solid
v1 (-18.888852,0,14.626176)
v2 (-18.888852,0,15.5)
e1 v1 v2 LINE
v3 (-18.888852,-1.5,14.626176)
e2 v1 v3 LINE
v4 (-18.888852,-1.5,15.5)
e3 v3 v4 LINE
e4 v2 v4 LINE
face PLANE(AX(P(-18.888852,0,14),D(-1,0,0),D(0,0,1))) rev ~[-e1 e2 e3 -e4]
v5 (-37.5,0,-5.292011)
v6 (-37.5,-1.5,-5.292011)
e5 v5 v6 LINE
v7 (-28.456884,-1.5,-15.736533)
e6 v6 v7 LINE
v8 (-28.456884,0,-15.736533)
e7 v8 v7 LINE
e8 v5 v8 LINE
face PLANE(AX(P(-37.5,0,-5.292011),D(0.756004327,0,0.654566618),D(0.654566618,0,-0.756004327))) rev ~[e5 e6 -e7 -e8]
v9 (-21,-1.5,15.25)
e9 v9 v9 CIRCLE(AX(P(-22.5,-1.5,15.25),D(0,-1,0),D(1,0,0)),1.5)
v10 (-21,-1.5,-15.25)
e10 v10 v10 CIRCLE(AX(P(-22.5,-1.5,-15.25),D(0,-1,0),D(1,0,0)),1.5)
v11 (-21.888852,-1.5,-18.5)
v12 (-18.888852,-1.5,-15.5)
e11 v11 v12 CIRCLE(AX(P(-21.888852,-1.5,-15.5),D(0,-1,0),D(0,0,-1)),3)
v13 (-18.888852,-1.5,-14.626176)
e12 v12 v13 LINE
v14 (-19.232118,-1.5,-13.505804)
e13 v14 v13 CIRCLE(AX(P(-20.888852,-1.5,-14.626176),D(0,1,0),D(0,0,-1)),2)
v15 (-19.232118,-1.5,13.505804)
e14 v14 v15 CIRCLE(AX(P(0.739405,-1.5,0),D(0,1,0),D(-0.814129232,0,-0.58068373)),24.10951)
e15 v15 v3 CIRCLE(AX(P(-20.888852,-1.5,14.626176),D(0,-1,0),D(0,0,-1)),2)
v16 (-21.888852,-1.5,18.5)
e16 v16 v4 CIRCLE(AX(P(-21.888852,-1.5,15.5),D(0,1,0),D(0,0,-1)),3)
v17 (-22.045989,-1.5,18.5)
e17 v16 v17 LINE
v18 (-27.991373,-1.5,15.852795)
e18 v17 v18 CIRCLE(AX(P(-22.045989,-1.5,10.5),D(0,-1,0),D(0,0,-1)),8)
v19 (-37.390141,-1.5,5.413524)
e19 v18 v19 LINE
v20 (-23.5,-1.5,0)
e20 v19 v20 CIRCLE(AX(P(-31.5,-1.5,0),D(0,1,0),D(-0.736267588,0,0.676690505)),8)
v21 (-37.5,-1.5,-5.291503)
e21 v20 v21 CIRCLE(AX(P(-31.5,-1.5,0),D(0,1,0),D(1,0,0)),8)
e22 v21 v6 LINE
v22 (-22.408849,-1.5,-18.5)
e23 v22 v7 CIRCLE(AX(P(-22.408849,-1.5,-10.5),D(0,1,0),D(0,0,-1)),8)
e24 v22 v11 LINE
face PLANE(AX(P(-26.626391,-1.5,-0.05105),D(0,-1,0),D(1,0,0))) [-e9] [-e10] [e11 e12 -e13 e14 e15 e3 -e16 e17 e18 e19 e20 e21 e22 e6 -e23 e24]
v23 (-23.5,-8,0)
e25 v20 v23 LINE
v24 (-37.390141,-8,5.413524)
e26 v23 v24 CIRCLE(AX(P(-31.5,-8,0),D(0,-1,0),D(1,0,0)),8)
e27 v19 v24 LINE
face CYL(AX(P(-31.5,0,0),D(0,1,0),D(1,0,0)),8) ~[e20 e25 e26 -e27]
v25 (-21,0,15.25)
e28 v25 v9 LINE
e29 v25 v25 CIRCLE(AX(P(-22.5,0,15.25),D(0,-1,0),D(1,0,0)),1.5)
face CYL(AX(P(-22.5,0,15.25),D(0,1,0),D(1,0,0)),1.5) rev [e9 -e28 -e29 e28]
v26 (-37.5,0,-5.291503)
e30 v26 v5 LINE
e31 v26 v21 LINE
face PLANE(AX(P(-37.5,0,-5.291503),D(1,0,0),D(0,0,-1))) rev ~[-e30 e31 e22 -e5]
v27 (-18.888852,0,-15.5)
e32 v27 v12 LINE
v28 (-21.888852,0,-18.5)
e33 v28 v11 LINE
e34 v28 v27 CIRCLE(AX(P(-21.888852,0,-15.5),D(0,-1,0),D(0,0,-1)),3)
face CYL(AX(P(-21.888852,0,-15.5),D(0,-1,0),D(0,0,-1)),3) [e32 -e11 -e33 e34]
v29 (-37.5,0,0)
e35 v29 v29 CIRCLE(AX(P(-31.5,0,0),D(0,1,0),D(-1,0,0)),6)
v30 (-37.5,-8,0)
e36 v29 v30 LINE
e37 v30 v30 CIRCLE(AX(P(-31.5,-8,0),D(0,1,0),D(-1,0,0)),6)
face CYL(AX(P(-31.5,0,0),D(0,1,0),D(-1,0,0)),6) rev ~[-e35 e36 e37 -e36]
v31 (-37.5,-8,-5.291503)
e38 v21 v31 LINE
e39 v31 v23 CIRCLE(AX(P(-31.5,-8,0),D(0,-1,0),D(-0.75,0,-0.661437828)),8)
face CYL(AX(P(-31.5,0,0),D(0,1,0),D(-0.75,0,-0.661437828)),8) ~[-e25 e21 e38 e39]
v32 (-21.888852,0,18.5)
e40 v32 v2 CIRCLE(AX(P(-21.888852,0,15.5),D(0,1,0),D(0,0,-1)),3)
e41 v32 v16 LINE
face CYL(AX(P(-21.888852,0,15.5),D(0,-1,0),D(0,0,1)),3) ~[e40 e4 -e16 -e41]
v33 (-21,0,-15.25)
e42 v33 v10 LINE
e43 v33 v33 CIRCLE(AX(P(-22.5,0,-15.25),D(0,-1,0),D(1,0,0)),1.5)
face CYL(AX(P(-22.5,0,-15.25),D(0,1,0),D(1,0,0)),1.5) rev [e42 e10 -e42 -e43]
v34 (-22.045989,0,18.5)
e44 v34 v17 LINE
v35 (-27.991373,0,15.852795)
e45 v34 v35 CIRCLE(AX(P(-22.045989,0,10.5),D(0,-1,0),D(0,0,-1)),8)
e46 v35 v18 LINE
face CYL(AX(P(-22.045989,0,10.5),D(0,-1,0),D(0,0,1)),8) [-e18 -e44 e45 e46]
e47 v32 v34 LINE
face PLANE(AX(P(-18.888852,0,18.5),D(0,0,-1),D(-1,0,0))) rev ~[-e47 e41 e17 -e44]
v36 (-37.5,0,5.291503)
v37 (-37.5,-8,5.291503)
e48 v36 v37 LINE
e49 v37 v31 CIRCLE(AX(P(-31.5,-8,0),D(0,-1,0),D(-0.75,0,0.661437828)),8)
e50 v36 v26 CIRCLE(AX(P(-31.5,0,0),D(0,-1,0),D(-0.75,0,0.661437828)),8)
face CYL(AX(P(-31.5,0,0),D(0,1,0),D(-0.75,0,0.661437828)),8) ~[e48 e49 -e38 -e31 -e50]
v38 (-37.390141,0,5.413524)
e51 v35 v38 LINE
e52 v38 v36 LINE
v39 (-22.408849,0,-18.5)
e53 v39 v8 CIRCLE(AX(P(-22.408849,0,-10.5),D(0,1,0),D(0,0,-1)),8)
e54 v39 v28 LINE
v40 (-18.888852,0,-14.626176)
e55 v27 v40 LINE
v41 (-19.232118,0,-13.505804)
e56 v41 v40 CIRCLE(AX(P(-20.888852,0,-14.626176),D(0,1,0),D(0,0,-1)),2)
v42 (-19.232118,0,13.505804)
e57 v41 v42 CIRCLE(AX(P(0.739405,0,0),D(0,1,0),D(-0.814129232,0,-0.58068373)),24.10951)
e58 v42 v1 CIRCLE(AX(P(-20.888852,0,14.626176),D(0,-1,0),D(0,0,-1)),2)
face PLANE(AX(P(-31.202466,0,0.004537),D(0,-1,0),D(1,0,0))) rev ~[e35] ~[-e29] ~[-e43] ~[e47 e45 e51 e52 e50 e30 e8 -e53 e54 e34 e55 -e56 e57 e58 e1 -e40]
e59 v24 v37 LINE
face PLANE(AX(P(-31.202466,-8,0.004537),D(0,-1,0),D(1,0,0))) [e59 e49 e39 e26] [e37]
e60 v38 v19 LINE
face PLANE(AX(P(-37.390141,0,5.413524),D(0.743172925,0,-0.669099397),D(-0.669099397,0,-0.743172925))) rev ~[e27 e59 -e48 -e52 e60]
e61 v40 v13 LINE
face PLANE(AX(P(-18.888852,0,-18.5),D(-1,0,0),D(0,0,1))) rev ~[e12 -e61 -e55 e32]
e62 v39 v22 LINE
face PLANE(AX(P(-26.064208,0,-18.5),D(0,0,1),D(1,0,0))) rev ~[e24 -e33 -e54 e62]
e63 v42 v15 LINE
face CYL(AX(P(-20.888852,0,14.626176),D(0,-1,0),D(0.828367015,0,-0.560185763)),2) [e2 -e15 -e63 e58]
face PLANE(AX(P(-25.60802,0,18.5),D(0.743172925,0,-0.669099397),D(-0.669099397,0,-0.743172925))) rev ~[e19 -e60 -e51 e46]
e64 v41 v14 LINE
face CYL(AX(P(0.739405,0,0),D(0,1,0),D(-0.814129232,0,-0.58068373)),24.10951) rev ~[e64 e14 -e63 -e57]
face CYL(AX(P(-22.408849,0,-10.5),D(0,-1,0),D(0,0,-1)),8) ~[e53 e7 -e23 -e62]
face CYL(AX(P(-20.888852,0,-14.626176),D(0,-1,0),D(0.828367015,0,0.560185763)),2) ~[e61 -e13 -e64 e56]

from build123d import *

# Parameters (mm, degrees)
F0_R     = 1.5
F1_DEPTH = 1.5
F2_DEPTH = 8
F3_R     = 8
F4_R     = 3
F5_R     = 2
F6_R     = 8
F7_R     = 3
F8_R     = 2


with BuildPart() as f1:
    # F0 (on Front) → F1 (new body)
    with BuildSketch(Plane.XZ):
        with BuildLine():
            Line((-26.0642077774, -18.5), (-18.8888516277, -18.5))
            Line((-18.8888516277, -18.5), (-18.8888516277, -14))
            ThreePointArc((-18.8888516277, -14), (-23.3701047123, 0), (-18.8888516277, 14))
            Line((-18.8888516277, 14), (-18.8888516277, 18.5))
            Line((-18.8888516277, 18.5), (-25.6080199033, 18.5))
            Line((-25.6080199033, 18.5), (-37.3901407018, 5.4135240382))
            ThreePointArc((-37.3901407018, 5.4135240382), (-28.5949290555, 7.4538958141), (-23.5, 0))
            ThreePointArc((-23.5, 0), (-28.6715728753, -7.4833147735), (-37.5, -5.2915026221))
            Line((-37.5, -5.2915026221), (-37.5, -5.2920114501))
            Line((-37.5, -5.2920114501), (-26.0642077774, -18.5))
        make_face()
        with Locations((-22.5, -15.25)):
            Circle(F0_R, mode=Mode.SUBTRACT)
        with Locations((-22.5, 15.25)):
            Circle(F0_R, mode=Mode.SUBTRACT)
    extrude(amount=F1_DEPTH)

    # F0 (on Front) → F2 (join)
    with BuildSketch(Plane.XZ):
        with BuildLine():
            Line((-37.5, 0), (-37.5, -5.2915026221))
            ThreePointArc((-37.5, -5.2915026221), (-28.6715728753, -7.4833147735), (-23.5, 0))
            ThreePointArc((-23.5, 0), (-28.5949290555, 7.4538958141), (-37.3901407018, 5.4135240382))
            Line((-37.3901407018, 5.4135240382), (-37.5, 5.2915026221))
            Line((-37.5, 5.2915026221), (-37.5, 0))
        make_face()
        with BuildLine():
            ThreePointArc((-25.5, 0), (-31.5, -6), (-37.5, 0))
            ThreePointArc((-37.5, 0), (-31.5, 6), (-25.5, 0))
        make_face(mode=Mode.SUBTRACT)
        with BuildLine():
            ThreePointArc((-37.5, 5.2915026221), (-39.5, 0), (-37.5, -5.2915026221))
            Line((-37.5, -5.2915026221), (-37.5, 0))
            Line((-37.5, 0), (-37.5, 5.2915026221))
        make_face()
    extrude(amount=F2_DEPTH)

    # F3
    f3_edges = [f1.edges().sort_by_distance(p)[0] for p in [
        (-26.064208, -0.75, -18.5),
    ]]
    fillet(f3_edges, radius=F3_R)

    # F4
    f4_edges = [f1.edges().sort_by_distance(p)[0] for p in [
        (-18.888852, -0.75, -18.5),
    ]]
    fillet(f4_edges, radius=F4_R)

    # F5
    f5_edges = [f1.edges().sort_by_distance(p)[0] for p in [
        (-18.888852, -0.75, 14),
    ]]
    fillet(f5_edges, radius=F5_R)

    # F6
    f6_edges = [f1.edges().sort_by_distance(p)[0] for p in [
        (-25.60802, -0.75, 18.5),
    ]]
    fillet(f6_edges, radius=F6_R)

    # F7
    f7_edges = [f1.edges().sort_by_distance(p)[0] for p in [
        (-18.888852, -0.75, 18.5),
    ]]
    fillet(f7_edges, radius=F7_R)

    # F8
    f8_edges = [f1.edges().sort_by_distance(p)[0] for p in [
        (-18.888852, -0.75, -14),
    ]]
    fillet(f8_edges, radius=F8_R)


solid = f1.part
